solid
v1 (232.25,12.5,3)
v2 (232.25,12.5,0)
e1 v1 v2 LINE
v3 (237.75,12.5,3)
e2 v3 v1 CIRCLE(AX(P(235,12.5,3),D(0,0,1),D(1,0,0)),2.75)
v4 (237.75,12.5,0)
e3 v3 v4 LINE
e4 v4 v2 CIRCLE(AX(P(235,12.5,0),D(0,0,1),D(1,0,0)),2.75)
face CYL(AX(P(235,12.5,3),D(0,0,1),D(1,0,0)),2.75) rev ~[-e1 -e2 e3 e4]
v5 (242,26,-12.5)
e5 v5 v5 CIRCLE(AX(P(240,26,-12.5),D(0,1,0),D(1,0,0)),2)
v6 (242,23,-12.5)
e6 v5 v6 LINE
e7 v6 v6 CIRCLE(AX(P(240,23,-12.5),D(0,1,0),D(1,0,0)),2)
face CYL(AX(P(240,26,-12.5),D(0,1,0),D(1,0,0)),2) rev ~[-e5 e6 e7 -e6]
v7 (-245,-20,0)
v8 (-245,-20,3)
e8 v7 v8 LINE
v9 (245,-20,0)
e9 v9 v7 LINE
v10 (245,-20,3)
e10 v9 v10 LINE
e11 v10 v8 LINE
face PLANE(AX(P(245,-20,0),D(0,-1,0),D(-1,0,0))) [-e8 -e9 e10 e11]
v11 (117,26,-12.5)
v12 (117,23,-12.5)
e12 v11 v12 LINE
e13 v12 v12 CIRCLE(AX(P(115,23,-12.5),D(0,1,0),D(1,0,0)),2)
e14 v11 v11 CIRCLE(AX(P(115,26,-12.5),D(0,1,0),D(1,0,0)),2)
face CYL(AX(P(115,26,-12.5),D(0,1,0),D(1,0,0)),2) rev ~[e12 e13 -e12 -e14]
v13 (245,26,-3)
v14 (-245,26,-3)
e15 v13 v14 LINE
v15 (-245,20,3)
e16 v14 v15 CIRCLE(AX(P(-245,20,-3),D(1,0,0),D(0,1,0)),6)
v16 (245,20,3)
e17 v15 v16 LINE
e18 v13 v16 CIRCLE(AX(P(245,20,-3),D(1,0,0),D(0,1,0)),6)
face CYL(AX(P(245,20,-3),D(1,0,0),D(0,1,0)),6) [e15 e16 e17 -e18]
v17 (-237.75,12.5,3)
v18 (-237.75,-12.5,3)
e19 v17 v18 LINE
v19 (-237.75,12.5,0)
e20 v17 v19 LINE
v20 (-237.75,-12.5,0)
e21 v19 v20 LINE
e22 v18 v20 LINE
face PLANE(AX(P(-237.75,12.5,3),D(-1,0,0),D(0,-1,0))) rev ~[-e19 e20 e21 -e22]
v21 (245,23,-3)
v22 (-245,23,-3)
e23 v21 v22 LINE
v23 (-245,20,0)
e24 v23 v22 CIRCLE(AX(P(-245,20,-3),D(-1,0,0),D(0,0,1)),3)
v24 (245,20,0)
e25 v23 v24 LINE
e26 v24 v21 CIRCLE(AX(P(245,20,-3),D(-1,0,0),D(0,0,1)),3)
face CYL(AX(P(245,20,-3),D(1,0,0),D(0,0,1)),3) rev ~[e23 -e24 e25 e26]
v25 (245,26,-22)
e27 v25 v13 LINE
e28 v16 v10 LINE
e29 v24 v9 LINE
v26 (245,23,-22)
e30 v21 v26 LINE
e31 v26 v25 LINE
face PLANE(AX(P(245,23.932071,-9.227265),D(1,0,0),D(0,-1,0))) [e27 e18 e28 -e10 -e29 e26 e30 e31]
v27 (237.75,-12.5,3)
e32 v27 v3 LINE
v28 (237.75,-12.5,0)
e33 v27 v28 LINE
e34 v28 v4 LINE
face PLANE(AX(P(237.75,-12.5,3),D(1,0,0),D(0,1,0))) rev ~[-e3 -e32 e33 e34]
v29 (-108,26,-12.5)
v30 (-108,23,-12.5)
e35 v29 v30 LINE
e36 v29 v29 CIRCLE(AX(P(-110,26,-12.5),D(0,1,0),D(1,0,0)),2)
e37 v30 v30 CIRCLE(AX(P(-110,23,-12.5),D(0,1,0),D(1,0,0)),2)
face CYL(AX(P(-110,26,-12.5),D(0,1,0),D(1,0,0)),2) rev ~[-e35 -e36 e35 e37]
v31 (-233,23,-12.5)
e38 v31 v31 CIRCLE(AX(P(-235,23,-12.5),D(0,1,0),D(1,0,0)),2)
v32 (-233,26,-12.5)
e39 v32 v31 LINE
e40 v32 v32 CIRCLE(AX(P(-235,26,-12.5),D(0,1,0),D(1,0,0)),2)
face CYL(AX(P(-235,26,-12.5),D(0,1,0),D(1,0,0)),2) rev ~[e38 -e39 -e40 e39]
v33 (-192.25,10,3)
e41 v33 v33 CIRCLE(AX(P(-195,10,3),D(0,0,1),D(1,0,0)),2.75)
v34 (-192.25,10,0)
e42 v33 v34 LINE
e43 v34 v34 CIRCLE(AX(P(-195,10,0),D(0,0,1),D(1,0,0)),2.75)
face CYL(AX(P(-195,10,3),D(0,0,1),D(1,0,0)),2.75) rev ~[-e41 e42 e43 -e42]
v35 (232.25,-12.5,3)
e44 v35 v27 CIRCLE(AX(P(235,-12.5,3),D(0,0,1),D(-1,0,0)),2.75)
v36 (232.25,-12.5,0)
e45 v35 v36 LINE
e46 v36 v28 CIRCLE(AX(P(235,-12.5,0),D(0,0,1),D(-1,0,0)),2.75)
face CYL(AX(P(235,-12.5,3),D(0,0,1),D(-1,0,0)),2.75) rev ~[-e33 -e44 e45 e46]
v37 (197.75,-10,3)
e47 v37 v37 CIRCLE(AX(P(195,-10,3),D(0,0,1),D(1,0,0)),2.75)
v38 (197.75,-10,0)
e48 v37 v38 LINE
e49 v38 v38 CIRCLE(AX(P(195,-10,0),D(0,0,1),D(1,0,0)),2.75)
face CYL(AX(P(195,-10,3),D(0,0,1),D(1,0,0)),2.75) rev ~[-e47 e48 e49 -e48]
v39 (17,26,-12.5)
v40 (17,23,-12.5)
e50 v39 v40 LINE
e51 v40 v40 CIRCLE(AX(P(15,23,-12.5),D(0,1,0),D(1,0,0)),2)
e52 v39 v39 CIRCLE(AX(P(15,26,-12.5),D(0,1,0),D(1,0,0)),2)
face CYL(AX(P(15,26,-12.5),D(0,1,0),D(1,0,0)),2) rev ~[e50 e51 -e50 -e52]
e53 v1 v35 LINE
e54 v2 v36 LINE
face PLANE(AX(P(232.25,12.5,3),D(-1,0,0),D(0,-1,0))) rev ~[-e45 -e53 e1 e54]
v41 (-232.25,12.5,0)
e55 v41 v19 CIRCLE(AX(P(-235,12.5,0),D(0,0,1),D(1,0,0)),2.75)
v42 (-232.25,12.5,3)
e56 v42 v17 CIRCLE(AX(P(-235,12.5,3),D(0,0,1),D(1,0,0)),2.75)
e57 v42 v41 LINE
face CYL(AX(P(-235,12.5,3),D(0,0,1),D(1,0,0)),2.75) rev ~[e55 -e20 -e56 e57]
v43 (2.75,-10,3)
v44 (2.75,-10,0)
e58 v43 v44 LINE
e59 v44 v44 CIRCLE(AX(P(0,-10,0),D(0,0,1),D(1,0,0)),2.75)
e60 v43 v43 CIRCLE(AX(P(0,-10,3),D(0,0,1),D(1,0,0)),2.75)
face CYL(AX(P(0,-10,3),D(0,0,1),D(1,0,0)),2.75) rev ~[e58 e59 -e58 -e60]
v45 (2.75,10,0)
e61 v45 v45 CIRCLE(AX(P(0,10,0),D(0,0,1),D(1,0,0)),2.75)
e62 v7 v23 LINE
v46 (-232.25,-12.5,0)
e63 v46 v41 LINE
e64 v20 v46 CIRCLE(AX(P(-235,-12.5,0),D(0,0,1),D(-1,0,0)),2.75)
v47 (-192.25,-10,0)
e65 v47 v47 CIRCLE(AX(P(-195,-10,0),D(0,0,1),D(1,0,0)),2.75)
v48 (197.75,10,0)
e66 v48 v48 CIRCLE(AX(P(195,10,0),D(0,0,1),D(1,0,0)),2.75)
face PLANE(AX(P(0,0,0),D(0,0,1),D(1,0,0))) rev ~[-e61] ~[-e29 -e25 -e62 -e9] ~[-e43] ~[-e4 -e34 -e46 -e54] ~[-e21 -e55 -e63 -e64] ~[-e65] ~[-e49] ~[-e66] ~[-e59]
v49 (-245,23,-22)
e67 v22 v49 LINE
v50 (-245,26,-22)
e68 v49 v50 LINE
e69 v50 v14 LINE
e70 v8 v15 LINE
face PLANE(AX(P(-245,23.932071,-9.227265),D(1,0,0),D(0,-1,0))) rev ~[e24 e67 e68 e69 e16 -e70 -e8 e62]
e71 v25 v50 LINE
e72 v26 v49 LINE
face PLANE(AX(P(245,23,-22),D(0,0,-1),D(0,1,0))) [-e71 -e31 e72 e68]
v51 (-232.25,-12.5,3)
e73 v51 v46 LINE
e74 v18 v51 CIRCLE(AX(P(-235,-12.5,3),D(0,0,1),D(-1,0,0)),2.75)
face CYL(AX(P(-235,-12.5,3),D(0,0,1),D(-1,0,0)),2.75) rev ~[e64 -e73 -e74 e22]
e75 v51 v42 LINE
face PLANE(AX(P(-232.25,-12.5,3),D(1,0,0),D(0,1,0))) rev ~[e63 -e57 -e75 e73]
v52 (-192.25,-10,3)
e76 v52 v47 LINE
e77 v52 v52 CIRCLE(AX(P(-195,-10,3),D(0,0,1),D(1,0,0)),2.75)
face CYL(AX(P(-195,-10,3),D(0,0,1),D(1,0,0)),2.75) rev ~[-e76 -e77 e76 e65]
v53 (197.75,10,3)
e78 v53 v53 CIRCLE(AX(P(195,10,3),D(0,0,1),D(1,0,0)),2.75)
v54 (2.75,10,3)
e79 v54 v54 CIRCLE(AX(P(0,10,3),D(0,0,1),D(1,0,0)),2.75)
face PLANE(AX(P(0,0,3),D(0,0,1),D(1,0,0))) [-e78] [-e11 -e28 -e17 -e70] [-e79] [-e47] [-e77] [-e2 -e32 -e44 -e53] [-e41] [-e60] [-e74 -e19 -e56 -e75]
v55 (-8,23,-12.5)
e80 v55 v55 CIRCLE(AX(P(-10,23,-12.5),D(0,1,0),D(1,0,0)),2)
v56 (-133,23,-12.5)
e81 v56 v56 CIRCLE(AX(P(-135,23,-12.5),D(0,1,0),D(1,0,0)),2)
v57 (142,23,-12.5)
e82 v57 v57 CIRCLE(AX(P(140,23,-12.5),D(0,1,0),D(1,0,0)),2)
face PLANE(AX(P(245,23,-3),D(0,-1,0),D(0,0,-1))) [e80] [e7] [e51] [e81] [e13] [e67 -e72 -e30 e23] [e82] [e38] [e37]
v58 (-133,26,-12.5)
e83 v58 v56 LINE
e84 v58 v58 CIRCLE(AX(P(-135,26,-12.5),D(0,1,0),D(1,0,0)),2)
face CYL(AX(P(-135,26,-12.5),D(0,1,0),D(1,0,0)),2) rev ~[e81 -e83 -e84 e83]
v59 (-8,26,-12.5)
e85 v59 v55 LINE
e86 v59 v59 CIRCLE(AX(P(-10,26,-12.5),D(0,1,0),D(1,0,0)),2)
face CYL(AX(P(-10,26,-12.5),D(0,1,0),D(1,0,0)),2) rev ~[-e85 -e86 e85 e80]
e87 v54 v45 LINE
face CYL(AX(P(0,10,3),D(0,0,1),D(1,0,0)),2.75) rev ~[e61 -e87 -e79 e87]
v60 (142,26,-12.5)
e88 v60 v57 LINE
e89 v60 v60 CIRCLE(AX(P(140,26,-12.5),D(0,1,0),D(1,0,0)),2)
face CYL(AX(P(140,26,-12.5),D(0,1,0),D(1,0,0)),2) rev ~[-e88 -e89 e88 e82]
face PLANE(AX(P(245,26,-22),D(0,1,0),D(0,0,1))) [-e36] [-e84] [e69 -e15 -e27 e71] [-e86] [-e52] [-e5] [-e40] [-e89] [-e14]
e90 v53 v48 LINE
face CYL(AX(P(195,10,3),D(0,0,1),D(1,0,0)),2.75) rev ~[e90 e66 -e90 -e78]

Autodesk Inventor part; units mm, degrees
ref_plane "YZ Plane" through (0, 0, 0) normal (1, 0, 0) x (0, 1, 0)
ref_plane "XZ Plane" through (0, 0, 0) normal (0, 1, 0) x (-1, 0, 0)
ref_plane "XY Plane" through (0, 0, 0) normal (0, 0, 1) x (1, 0, 0)
sketch "Sketch1" plane through (0, 0, 0) normal (0, 0, 1) x (1, 0, 0)
  line L0 (-245, 20) -> (245, 20)
  line L1 (245, 20) -> (245, -20)
  line L2 (245, -20) -> (-245, -20)
  line L3 (-245, -20) -> (-245, 20)
  point P0 (0, 0)
  dimension "d0" = 490
  dimension "d1" = 40
  dimension "d2" = 20
  dimension "d3" = 245
extrude "Plate1" add sketch "Sketch1" along normal blind 3
sketch "Sketch2" plane through (0, 0, 3) normal (0, 0, 1) x (1, 0, 0)
  line L0 (-245, 20) -> (245, 20) projected
  line L1 (-245, -20) -> (-245, 20) projected
  arc A0 (-232.25, 12.5) -> (-237.75, 12.5) centre (-235, 12.5) ccw
  arc A1 (-237.75, -12.5) -> (-232.25, -12.5) centre (-235, -12.5) ccw
  line L2 (-237.75, 12.5) -> (-237.75, -12.5)
  line L3 (-232.25, -12.5) -> (-232.25, 12.5)
  point P0 (0, 0)
  dimension "d5" = 5.5
  dimension "d6" = 5.5
  dimension "d8" = 10
  dimension "d9" = 10
  dimension "d11" = 7.5
  dimension "d27" = 25
  dimension "d28" = 25
extrude "Extrusion1" cut sketch "Sketch2" against normal blind 10
pattern_linear "Rectangular Pattern1" count 2 spacing 470 along (1, 0, 0) of "Extrusion1"
sketch "Sketch3" plane through (245, 23, -3) normal (0, 1, 0) x (-1, 0, 0)
  line L0 (490, 0) -> (0, 0)
  line L1 (0, 0) -> (0, -19)
  line L2 (0, -19) -> (490, -19)
  line L3 (490, -19) -> (490, 0)
edge flange "Flange1" height 25 angle 90 thickness 3 bend radius 3 thickness toward (0, 1, 0) relief tear relief width 3 relief depth 1.5 edges at (0, 20, 0) wall of the first edge with corners at (-245, 23, -3) (245, 23, -3) (245, 23, -22) (-245, 23, -22)
bend "Bend1"
corner "Corner1"
sketch "Sketch4" plane through (-245, 26, -22) normal (0, 1, 0) x (1, 0, 0)
  line L0 (0, 0) -> (490, 0) projected
  line L1 (0, -19) -> (0, 0) projected
  circle A0 centre (10, -9.5) radius 2
  circle A1 centre (110, -9.5) radius 2
  point P0 (245, -22)
  dimension "d29" = 4
  dimension "d30" = 9.5
  dimension "d31" = 10
  dimension "d32" = 4
  dimension "d33" = 110
  dimension "d34" = 9.5
extrude "Extrusion2" cut sketch "Sketch4" against normal through all
pattern_linear "Rectangular Pattern2" count 4 spacing 125 along (1, 0, 0) of "Extrusion2"
sketch "Sketch5" plane through (0, 0, 3) normal (0, 0, 1) x (1, 0, 0)
  line L0 (-245, 20) -> (245, 20) projected
  line L1 (-245, -20) -> (-245, 20) projected
  circle A0 centre (-195, 10) radius 2.75
  circle A1 centre (-195, -10) radius 2.75
  point P0 (0, 0)
  dimension "d40" = 5.5
  dimension "d41" = 5.5
  dimension "d42" = 20
  dimension "d43" = 10
  dimension "d44" = 50
  dimension "d45" = 50
extrude "Extrusion3" cut sketch "Sketch5" against normal through all
pattern_linear "Rectangular Pattern3" count 3 spacing 195 along (1, 0, 0) of "Extrusion3"
equation "\"d17\" = BendReliefWidth"
equation "\"d18\" = BendReliefDepth"
equation "\"d19\" = MinimumRemnant"
equation "\"d20\" = BendRadius"
equation "\"d23\" = BendRadius"
equation "\"d24\" = CornerReliefSize"
equation "\"d25\" = GapSize"
equation "\"d26\" = JacobiRadiusSize"
equation "\"d2\" = 0.5 * d1"
equation "\"d3\" = 0.5 * d0"
equation "\"BendRadius\" = Thickness"
equation "\"BendReliefWidth\" = Thickness"
equation "\"BendReliefDepth\" = 0.5 * Thickness"
equation "\"CornerReliefSize\" = 4 * Thickness"
equation "\"MinimumRemnant\" = 2 * Thickness"
equation "\"TransitionRadius\" = BendRadius"
equation "\"JacobiRadiusSize\" = BendRadius"
equation "\"GapSize\" = Thickness"
equation "\"d4\" = BendRadius"
equation "\"Thickness\" = 3"
properties part number "formed_right_left" material "Steel, Mild"
